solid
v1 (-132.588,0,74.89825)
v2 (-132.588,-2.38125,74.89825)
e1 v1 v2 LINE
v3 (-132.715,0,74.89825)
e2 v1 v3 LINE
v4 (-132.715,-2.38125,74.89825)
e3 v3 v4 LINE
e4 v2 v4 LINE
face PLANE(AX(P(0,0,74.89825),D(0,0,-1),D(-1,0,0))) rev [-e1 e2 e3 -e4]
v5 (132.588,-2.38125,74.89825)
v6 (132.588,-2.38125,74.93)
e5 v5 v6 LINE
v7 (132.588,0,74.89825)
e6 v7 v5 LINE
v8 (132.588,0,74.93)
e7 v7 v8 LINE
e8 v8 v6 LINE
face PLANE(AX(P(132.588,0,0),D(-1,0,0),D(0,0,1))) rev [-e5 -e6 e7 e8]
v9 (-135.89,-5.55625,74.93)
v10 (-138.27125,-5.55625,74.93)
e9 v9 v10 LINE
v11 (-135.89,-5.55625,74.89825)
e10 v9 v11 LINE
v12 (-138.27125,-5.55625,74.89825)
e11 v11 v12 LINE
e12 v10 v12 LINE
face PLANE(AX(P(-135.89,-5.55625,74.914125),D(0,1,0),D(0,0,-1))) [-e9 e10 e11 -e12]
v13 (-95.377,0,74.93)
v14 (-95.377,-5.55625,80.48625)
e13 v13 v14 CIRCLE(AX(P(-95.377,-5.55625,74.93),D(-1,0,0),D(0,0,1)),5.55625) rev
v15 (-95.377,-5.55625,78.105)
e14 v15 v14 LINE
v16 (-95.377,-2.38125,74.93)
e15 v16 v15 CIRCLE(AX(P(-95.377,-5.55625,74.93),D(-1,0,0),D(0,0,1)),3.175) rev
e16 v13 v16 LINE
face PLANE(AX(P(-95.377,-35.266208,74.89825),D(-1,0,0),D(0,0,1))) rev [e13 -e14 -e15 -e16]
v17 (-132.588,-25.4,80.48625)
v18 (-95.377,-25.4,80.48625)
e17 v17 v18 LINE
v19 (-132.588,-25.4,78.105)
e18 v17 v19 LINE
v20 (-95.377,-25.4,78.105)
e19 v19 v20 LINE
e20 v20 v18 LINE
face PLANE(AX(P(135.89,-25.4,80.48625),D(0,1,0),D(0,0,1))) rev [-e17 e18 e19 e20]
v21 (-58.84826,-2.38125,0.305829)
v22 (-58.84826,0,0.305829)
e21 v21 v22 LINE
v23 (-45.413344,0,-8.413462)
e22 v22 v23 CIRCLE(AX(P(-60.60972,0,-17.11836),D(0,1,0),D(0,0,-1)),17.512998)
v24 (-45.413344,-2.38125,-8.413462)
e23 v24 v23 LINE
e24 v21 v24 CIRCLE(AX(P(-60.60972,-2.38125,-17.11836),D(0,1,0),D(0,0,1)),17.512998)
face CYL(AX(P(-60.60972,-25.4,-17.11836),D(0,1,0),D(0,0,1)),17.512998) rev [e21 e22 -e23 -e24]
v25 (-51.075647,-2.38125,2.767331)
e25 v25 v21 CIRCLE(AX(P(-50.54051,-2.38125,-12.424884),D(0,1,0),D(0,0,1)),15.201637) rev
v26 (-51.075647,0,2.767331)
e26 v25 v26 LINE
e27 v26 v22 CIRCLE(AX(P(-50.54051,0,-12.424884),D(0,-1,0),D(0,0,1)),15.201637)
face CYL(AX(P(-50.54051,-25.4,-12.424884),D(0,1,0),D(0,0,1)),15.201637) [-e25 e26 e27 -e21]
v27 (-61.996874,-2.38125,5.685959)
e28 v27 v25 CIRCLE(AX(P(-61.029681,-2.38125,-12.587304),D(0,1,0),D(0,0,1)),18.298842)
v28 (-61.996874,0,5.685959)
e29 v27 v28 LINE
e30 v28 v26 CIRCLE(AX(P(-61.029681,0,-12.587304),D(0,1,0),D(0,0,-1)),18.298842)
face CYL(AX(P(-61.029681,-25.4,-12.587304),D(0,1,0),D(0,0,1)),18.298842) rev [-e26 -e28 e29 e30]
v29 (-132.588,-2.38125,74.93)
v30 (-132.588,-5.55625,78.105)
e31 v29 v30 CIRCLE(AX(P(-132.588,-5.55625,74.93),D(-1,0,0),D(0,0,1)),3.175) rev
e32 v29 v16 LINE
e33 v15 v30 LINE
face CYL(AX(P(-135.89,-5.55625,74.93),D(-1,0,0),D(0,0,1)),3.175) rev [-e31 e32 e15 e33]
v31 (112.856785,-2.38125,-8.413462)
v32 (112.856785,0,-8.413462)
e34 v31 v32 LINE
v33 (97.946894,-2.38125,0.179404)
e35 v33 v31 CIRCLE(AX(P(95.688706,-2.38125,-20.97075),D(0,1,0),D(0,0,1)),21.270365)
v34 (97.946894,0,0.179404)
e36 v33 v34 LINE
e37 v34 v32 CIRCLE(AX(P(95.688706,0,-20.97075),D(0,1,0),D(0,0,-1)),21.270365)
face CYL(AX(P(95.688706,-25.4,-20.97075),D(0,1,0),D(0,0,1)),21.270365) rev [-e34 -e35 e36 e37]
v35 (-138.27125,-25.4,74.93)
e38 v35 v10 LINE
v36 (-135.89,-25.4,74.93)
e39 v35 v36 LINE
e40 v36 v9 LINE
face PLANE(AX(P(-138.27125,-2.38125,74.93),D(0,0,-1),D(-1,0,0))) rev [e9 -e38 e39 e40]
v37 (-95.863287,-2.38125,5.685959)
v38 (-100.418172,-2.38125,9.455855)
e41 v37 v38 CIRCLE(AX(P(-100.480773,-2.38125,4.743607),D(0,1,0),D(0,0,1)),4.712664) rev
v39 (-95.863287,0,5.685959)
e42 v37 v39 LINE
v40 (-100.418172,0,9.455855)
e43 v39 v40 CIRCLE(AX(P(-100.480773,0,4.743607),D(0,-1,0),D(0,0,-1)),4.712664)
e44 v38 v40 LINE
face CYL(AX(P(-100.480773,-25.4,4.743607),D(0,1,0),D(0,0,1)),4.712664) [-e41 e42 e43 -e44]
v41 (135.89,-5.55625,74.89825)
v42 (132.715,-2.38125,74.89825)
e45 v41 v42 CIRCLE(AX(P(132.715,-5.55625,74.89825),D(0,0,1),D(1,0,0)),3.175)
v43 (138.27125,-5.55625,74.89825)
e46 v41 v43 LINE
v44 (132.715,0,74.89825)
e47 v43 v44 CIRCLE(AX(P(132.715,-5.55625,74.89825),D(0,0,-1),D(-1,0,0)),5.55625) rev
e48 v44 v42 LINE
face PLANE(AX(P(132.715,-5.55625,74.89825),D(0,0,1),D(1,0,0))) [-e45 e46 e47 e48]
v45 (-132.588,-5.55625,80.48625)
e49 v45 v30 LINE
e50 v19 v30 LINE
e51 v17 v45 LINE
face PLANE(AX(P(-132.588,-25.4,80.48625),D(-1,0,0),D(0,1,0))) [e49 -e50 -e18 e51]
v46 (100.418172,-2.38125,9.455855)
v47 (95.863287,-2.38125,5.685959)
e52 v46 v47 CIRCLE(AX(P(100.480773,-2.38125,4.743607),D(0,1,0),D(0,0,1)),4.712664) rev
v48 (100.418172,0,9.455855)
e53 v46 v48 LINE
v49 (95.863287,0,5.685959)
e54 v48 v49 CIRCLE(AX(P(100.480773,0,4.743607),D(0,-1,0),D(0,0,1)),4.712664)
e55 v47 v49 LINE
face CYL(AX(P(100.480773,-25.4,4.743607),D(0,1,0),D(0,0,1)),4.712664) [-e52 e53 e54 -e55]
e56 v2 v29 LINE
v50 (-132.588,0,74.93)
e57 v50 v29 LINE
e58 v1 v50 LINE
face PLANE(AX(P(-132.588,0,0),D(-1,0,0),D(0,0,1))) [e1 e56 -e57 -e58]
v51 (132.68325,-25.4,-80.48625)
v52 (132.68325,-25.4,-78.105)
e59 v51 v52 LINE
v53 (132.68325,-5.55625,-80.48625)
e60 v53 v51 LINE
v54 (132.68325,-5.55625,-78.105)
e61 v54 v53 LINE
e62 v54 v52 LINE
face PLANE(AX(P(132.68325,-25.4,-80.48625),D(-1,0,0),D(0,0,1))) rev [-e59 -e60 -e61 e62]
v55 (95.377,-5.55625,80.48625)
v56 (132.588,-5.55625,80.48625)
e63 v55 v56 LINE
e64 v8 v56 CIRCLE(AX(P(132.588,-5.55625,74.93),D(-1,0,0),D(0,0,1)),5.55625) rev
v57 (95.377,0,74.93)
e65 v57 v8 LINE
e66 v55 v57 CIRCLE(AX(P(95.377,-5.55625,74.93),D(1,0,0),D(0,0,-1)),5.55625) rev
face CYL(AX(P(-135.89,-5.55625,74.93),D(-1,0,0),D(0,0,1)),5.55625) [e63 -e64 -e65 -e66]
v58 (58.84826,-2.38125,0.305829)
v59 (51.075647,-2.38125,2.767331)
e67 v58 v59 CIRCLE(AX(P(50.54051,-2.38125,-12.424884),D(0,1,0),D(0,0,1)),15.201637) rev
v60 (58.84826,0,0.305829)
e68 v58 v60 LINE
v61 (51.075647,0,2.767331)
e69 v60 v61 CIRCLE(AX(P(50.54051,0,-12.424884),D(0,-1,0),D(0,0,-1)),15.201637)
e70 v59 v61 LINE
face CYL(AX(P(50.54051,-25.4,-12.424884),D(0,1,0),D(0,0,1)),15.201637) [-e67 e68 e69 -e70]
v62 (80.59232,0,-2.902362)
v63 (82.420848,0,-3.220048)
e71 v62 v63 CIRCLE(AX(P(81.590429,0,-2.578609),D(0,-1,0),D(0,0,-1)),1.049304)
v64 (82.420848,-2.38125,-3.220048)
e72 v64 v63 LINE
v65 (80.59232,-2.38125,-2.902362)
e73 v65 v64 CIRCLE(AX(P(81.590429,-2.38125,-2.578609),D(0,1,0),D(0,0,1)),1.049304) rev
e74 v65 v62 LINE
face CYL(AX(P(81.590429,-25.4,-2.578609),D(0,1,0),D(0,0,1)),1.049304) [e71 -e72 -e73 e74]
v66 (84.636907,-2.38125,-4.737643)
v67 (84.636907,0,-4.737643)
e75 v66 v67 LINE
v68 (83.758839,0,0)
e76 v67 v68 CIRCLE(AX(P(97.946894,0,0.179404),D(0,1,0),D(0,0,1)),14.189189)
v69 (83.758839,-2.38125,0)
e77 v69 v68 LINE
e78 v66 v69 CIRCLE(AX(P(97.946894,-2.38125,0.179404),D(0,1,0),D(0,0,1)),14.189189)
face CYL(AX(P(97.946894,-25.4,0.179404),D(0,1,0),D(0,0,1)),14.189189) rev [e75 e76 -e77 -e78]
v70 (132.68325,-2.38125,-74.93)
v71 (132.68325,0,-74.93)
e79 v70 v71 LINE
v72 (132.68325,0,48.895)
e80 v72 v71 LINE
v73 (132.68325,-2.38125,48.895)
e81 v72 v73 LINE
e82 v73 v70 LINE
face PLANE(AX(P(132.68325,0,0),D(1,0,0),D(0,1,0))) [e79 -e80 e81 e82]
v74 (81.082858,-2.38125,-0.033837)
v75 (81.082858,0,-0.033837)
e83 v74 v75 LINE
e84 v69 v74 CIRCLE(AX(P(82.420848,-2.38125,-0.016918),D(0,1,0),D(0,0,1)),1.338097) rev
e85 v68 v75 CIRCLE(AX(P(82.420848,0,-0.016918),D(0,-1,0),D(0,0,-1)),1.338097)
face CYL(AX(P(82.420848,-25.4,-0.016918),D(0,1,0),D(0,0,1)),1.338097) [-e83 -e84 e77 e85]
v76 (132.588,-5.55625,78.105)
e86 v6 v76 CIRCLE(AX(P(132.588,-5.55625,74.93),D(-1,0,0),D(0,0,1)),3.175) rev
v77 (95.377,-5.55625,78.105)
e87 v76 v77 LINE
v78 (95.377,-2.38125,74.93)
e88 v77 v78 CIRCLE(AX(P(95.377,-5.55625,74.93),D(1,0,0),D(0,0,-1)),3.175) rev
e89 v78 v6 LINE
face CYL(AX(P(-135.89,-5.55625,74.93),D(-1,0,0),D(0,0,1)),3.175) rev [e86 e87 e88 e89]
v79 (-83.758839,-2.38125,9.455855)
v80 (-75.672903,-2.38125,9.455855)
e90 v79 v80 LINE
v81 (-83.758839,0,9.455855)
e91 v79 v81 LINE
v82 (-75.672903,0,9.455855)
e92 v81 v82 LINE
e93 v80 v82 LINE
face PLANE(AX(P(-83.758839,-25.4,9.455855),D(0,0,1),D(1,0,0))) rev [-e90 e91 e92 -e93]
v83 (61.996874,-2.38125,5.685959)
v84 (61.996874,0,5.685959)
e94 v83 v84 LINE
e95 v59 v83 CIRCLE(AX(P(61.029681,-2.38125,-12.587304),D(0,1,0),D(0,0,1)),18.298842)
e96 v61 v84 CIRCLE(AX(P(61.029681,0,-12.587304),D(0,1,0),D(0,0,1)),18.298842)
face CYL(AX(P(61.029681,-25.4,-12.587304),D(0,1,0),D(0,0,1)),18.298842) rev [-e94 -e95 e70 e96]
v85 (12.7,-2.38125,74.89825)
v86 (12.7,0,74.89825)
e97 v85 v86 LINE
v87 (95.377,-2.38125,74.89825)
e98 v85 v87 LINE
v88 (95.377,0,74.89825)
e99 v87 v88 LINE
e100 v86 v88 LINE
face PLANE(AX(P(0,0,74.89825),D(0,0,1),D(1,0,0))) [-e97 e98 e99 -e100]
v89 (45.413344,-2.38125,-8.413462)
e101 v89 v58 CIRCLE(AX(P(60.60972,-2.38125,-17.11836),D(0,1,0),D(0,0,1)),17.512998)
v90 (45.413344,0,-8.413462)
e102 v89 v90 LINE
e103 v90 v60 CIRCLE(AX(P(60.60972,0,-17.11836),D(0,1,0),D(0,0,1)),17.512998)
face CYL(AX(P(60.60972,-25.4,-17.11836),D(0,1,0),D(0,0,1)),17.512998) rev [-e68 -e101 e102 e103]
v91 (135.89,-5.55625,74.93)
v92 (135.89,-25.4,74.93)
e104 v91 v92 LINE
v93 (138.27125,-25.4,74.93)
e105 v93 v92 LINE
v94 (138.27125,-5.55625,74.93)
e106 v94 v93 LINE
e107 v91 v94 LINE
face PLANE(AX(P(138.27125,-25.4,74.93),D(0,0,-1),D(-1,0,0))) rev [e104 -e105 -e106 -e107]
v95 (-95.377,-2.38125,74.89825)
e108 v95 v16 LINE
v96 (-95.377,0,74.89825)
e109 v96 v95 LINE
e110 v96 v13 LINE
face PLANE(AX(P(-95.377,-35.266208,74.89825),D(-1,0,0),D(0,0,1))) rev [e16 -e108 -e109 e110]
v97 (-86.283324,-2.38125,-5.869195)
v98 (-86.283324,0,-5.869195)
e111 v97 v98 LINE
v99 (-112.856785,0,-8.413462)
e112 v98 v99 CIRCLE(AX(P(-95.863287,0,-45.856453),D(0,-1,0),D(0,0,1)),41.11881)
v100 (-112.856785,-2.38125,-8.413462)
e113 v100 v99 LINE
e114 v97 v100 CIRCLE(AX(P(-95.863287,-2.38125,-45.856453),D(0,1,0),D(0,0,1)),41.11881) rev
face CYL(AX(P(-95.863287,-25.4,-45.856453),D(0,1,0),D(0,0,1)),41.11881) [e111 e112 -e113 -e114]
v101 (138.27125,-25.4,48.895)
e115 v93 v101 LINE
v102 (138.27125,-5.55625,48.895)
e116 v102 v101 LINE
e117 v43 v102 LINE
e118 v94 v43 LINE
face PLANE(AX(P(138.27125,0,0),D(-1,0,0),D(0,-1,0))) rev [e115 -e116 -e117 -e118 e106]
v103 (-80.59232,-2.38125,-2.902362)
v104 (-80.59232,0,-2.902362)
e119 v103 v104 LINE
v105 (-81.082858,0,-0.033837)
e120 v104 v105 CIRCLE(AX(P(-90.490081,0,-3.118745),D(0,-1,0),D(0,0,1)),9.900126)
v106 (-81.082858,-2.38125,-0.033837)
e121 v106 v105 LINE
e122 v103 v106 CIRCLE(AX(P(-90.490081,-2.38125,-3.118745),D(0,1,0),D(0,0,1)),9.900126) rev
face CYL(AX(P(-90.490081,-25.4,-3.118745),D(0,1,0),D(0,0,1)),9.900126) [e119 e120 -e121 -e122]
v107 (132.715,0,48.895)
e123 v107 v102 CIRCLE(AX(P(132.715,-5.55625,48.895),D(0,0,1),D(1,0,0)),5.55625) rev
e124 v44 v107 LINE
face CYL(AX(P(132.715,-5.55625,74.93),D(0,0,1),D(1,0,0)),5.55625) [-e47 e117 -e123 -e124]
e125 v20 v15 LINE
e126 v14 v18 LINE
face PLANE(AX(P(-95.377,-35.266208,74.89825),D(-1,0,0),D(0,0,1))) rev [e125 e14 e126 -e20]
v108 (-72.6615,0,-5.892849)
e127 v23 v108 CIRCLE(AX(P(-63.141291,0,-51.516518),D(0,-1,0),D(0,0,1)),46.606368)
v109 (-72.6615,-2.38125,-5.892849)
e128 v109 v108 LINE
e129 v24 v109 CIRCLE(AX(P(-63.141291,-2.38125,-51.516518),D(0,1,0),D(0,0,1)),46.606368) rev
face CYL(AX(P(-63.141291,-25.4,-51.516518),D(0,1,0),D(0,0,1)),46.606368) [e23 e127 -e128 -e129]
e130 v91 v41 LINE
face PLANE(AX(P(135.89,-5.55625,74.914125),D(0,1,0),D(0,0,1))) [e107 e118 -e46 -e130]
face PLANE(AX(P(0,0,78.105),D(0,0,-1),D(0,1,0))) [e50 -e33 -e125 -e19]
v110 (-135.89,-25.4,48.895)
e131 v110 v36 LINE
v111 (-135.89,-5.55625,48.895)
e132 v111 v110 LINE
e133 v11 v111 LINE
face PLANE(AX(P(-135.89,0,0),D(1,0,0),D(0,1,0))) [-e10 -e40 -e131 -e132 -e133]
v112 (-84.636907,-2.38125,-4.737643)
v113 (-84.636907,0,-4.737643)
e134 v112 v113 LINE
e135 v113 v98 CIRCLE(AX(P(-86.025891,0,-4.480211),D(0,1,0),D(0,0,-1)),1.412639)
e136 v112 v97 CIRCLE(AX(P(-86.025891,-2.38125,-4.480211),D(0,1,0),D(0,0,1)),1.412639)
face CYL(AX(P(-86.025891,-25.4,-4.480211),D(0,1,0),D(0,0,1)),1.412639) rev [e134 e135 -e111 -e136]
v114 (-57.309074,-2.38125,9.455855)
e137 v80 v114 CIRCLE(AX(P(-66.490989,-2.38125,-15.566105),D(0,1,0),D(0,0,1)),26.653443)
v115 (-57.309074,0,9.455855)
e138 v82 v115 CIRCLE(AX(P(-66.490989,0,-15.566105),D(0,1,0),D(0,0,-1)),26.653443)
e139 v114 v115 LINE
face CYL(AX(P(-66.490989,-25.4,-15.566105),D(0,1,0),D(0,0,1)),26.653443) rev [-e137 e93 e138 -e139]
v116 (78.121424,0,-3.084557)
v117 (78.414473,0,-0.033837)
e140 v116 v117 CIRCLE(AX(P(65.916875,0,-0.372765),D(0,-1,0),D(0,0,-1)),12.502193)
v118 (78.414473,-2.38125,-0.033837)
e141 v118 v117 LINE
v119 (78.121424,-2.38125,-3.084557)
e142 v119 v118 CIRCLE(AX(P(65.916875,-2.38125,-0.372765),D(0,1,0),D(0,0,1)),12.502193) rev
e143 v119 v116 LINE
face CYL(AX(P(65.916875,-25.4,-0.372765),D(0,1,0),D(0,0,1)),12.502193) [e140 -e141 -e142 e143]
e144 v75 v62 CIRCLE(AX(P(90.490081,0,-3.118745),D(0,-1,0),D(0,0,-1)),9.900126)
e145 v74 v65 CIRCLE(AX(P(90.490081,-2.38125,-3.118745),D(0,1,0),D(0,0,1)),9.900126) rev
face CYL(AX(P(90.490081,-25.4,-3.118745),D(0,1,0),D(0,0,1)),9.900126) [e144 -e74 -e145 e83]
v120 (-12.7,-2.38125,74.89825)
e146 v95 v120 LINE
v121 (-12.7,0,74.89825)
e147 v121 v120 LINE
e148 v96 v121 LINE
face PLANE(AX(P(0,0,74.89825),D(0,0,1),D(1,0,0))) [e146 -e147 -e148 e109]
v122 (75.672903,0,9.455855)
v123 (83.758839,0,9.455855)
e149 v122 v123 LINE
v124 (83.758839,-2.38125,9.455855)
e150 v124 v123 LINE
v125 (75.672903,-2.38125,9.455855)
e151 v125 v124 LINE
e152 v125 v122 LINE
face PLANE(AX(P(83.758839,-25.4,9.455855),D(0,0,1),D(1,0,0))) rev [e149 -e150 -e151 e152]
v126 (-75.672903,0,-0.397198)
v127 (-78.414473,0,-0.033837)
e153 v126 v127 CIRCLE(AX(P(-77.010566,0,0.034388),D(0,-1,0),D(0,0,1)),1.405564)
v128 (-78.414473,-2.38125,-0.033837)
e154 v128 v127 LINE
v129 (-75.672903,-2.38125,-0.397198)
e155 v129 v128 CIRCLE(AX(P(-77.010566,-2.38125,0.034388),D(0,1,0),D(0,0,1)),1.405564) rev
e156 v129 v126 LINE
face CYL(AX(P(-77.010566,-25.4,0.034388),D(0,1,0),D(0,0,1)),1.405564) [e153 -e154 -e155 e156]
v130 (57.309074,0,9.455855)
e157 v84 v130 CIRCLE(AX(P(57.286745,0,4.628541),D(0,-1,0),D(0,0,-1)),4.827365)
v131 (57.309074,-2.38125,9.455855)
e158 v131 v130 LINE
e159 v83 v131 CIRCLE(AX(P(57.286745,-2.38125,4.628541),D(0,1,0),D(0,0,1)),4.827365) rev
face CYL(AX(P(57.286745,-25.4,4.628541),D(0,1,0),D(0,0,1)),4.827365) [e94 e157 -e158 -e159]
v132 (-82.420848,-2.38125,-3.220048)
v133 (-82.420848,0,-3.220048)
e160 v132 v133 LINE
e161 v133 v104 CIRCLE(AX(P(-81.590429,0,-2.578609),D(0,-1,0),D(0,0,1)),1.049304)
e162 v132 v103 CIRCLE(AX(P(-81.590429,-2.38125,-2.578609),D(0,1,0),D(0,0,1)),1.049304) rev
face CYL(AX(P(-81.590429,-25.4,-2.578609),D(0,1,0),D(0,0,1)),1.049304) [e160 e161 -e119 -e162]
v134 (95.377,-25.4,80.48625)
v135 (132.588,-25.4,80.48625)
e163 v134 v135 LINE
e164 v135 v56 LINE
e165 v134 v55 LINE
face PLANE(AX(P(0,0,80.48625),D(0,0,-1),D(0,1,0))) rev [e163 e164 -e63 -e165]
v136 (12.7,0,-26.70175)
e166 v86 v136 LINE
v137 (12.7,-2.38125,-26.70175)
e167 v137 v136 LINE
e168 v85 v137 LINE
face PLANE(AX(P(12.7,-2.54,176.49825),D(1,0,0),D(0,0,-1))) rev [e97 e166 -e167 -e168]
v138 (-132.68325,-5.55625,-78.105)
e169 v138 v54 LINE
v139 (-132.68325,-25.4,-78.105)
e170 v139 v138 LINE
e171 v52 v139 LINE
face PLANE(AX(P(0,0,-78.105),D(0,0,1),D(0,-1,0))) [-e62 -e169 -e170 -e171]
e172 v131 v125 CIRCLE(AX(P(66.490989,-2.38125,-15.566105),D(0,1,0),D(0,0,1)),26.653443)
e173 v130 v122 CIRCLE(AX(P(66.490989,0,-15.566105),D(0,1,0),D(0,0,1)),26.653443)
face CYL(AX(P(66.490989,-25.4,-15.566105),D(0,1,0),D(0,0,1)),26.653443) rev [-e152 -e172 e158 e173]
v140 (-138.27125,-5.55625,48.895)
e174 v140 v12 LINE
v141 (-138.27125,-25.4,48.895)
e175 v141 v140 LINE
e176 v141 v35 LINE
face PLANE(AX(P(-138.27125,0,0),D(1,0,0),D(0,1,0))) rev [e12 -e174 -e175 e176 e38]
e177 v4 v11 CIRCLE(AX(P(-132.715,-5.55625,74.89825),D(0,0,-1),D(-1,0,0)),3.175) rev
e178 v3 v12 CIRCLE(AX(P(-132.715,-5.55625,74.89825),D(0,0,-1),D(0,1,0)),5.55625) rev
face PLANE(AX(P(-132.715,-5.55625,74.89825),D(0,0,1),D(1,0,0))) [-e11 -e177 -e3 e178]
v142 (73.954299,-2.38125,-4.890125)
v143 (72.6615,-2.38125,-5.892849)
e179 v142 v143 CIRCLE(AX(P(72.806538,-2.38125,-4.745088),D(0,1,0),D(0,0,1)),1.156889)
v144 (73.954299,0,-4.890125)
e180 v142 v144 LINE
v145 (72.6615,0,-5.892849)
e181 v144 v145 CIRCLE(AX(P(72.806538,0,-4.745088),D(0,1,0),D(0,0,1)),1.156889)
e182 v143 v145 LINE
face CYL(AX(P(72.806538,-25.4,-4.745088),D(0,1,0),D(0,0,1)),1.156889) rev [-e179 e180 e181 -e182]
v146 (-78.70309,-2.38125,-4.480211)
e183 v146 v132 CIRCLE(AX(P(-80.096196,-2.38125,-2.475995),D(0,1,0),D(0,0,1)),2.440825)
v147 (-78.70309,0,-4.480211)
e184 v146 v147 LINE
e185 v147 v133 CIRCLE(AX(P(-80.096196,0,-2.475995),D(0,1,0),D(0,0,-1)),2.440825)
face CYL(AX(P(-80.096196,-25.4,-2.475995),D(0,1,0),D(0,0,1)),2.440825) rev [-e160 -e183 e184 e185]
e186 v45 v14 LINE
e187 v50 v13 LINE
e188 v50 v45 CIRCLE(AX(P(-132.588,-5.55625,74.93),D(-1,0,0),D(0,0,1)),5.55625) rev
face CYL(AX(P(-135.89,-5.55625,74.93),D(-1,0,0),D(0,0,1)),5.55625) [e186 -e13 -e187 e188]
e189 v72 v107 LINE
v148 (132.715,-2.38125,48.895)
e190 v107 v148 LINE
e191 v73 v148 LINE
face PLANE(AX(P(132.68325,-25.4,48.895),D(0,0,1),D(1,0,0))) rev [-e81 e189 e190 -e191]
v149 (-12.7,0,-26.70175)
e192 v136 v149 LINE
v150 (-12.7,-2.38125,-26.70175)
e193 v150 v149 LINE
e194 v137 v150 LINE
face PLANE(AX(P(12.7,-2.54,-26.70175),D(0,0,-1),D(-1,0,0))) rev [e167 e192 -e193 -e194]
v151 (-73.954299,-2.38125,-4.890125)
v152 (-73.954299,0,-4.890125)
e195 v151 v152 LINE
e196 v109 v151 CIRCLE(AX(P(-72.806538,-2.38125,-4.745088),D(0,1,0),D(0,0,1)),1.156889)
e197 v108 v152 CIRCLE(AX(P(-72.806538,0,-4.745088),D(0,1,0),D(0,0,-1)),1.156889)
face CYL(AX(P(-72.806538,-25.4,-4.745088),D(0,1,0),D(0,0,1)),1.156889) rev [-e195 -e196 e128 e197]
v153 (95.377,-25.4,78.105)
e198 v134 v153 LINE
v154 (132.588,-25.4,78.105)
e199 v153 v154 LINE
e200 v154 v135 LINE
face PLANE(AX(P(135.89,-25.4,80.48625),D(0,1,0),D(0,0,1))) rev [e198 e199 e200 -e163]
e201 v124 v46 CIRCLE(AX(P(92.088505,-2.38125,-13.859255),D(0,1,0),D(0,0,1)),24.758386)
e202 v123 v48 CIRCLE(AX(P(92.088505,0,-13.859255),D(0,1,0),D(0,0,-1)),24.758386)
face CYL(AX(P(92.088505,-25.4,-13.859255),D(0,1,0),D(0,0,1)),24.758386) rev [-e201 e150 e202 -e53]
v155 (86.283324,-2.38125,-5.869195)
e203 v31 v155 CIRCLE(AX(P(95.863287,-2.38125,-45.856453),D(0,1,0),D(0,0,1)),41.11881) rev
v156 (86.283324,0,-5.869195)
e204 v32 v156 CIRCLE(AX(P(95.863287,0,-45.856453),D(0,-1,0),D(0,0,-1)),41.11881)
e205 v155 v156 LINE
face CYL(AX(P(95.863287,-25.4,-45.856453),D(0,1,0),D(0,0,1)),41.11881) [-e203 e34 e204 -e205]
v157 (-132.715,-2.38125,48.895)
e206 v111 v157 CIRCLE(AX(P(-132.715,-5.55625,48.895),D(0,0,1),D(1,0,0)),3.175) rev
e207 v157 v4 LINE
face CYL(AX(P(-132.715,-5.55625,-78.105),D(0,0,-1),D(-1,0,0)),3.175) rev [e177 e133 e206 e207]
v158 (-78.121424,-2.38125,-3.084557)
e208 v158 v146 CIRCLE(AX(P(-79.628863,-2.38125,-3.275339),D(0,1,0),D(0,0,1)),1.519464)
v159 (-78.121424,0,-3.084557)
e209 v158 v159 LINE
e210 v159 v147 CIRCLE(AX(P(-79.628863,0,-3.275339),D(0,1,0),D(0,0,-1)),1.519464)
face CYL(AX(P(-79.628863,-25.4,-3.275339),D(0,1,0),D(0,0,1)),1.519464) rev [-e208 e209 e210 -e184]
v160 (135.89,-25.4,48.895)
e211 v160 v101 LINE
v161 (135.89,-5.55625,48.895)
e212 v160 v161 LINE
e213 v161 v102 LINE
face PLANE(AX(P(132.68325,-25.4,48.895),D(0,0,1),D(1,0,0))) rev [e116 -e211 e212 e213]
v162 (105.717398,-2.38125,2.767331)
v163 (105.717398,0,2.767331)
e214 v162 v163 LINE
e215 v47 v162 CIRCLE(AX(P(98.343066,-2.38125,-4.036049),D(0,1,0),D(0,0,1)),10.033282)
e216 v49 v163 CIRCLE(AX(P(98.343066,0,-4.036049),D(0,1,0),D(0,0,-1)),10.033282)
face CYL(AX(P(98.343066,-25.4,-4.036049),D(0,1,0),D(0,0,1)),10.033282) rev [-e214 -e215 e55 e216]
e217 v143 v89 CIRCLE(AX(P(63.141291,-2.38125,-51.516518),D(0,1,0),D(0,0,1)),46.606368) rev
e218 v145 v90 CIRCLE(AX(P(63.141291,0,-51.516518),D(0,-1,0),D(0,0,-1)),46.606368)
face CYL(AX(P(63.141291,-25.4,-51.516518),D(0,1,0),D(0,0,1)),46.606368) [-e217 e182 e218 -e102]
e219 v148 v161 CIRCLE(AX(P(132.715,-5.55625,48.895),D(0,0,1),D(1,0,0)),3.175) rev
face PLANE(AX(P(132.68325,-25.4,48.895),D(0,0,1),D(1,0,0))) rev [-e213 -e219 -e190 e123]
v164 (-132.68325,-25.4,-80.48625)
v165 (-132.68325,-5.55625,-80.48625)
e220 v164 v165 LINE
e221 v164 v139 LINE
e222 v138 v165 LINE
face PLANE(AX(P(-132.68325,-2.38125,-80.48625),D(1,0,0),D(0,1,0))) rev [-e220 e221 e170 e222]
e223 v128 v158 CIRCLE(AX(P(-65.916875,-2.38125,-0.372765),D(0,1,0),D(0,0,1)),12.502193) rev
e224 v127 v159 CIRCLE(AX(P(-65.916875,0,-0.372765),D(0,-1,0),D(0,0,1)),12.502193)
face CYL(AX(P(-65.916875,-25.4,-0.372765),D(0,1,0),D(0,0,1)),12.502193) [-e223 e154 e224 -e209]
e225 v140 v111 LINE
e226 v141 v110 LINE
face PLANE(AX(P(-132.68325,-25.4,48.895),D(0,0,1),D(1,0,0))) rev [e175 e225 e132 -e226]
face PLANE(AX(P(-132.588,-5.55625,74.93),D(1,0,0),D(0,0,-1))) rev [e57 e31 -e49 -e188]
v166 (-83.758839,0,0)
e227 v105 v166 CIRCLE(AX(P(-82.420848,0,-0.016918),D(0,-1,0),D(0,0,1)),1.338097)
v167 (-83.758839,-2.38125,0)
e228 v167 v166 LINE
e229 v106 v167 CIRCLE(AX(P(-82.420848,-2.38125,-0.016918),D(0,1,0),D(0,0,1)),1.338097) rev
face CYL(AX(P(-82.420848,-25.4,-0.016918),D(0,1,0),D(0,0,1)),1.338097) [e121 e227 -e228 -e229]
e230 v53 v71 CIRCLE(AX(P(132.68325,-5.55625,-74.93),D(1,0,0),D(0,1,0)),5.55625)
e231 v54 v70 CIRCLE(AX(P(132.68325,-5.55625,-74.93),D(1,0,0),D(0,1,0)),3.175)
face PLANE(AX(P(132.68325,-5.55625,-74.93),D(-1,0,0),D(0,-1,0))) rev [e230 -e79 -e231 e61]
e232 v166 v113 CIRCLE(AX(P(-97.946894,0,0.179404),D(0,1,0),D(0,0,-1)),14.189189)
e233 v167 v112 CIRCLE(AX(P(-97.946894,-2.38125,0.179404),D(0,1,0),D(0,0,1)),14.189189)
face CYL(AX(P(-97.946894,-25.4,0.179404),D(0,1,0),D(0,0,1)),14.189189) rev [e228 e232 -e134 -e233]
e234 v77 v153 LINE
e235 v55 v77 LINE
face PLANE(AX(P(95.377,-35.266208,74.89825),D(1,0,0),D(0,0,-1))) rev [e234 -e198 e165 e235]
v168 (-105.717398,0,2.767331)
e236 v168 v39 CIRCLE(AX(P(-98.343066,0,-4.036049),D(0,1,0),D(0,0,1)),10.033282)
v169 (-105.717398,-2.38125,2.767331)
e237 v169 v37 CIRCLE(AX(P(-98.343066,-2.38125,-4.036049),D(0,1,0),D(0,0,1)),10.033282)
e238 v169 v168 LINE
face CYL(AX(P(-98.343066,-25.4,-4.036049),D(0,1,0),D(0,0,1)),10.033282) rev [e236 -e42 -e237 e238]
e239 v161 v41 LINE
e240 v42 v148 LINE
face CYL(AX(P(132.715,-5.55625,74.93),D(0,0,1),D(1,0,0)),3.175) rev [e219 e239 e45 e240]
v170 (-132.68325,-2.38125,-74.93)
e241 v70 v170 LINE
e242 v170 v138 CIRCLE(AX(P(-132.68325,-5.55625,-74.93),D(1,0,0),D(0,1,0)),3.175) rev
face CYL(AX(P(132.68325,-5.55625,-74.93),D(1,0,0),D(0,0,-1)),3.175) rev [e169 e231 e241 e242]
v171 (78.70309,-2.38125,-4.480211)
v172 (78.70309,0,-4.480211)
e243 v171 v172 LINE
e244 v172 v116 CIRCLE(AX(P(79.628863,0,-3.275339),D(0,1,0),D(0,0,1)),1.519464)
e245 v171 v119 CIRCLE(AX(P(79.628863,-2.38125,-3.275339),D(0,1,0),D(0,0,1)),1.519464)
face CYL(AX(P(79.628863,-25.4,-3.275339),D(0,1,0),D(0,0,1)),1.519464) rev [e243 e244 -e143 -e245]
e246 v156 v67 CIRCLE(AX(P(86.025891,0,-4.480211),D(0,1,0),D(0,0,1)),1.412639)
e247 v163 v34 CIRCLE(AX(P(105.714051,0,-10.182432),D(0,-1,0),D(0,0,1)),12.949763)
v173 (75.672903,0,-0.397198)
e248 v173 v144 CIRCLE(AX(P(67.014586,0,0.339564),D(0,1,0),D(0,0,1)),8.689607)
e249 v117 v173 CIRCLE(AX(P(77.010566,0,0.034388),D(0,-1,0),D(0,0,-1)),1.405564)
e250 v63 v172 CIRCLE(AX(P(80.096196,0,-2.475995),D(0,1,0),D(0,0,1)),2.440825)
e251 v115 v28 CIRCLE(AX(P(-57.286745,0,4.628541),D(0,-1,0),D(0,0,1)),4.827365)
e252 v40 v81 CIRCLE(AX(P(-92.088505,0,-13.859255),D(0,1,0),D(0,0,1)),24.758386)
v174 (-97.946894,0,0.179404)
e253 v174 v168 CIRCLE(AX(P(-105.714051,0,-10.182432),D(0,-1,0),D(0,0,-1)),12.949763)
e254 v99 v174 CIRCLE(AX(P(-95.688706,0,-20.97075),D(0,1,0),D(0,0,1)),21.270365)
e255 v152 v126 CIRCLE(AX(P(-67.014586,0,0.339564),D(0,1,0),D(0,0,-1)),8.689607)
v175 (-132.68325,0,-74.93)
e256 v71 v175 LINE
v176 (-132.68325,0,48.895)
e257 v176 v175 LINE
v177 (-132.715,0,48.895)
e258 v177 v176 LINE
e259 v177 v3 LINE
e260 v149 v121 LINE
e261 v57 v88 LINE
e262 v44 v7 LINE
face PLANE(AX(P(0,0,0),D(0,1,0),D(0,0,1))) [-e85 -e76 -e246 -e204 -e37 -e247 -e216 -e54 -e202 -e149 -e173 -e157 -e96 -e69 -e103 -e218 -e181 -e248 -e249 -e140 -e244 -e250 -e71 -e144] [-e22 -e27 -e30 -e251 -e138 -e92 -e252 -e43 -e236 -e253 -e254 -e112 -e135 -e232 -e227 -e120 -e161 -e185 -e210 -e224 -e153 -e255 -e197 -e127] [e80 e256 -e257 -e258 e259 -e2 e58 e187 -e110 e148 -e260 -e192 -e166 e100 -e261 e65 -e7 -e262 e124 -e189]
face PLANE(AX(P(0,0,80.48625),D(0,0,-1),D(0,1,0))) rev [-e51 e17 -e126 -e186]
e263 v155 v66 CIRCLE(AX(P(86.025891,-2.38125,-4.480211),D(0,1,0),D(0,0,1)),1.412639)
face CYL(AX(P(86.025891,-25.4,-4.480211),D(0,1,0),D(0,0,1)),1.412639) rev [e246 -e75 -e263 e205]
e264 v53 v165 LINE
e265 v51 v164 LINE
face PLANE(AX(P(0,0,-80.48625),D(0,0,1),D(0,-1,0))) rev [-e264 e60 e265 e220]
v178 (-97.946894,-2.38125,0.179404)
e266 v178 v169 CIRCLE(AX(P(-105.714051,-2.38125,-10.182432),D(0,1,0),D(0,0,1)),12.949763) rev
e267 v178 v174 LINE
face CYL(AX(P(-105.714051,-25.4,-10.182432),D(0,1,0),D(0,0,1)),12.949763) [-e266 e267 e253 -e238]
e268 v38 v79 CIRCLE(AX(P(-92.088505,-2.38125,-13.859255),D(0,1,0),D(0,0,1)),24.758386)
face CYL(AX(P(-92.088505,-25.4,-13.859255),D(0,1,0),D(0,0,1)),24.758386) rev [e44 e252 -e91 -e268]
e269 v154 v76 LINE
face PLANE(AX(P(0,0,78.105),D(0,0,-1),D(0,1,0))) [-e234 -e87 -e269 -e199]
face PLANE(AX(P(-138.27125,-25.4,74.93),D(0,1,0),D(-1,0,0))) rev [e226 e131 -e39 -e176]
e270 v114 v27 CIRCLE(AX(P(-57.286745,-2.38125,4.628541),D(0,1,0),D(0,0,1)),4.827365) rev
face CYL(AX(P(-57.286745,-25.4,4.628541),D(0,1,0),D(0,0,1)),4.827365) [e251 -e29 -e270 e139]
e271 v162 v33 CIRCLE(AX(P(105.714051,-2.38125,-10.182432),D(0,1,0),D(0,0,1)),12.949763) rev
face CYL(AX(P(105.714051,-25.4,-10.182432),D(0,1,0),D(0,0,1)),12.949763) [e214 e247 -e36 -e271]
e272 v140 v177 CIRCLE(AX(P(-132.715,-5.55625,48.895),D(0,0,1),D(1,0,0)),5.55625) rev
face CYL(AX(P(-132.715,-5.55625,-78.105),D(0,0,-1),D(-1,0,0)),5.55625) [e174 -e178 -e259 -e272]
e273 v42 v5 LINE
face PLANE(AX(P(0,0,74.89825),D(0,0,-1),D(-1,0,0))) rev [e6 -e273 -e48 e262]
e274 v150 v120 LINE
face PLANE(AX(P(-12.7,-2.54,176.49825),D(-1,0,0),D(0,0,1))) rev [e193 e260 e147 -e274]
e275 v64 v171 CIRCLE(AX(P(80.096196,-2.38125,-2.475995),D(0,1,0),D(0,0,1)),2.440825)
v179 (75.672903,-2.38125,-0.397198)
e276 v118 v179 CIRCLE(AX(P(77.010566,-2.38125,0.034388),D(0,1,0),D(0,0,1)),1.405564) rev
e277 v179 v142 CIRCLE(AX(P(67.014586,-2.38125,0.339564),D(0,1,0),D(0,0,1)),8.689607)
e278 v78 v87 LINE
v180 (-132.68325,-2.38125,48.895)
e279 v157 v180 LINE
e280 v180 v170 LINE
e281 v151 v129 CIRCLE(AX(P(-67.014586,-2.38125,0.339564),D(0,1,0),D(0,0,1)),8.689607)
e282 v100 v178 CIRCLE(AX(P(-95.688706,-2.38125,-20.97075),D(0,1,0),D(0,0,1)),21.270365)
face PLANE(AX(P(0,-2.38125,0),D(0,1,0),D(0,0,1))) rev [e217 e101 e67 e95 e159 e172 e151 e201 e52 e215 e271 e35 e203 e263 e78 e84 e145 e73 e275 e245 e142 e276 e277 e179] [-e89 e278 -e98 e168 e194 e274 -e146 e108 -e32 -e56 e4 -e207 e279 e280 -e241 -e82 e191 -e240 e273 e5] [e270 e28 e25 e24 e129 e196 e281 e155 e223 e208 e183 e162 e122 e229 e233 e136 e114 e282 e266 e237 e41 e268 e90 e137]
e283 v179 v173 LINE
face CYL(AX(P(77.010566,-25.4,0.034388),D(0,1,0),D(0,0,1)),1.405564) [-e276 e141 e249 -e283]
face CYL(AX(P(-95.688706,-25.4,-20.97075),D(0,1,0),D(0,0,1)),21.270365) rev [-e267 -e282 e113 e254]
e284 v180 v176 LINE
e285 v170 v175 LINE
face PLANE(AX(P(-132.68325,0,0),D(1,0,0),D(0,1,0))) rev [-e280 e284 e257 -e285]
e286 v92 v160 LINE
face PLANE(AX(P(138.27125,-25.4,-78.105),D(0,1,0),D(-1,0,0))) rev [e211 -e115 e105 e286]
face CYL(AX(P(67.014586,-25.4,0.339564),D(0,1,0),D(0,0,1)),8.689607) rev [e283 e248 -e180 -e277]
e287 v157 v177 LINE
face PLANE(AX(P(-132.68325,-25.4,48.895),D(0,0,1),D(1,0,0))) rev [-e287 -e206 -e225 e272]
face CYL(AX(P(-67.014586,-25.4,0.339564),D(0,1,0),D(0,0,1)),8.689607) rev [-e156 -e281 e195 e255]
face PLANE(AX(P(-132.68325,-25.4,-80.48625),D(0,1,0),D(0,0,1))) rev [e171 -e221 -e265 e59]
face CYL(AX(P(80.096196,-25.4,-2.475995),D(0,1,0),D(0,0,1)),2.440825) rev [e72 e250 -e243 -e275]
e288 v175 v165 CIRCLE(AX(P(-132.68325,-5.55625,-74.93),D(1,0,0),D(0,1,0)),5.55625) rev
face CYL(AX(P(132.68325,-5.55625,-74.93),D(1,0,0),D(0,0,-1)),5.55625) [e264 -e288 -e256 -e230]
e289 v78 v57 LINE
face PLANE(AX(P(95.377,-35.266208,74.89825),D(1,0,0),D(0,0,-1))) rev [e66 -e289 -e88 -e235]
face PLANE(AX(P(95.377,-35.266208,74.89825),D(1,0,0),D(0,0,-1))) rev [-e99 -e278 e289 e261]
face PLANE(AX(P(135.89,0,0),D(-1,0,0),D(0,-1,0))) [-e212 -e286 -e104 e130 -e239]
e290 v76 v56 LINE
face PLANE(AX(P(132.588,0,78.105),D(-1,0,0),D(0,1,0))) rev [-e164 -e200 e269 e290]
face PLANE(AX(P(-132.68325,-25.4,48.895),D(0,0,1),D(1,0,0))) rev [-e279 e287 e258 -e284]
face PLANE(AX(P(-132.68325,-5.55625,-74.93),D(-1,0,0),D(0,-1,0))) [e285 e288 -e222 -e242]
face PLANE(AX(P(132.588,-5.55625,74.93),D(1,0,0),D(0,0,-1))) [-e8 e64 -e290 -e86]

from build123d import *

# Parameters (mm, degrees)
SKETCH1_W                    = 271.78
SKETCH1_H                    = 156.21
BASE_FLANGE1_DEPTH           = 2.38125
EDGE_FLANGE1_STRIP_W         = 15.875
EDGE_FLANGE1_STRIP_H         = 2.38125
EDGE_FLANGE1_STRIP_CUT_DEPTH = 271.78
EDGE_FLANGE1_DEPTH           = 271.78
EDGE_FLANGE2_STRIP_W         = 15.875
EDGE_FLANGE2_STRIP_H         = 2.38125
EDGE_FLANGE2_STRIP_CUT_DEPTH = 153.035
EDGE_FLANGE2_DEPTH           = 153.035
SKETCH14_W                   = 127
SKETCH14_H                   = 30.097595223
CUT_EXTRUDE1_DEPTH           = 5.588
EDGE_FLANGE3_STRIP_W         = 15.875
EDGE_FLANGE3_STRIP_H         = 2.38125
EDGE_FLANGE3_STRIP_CUT_DEPTH = 153.035
EDGE_FLANGE3_DEPTH           = 153.035
SKETCH18_W                   = 127
SKETCH18_H                   = 45.504454023
CUT_EXTRUDE2_DEPTH           = 5.588
CUT_EXTRUDE3_START           = -3.302
CUT_EXTRUDE3_DEPTH           = 5.68325
CUT_EXTRUDE4_START           = -3.302
CUT_EXTRUDE4_DEPTH           = 5.68325
EDGE_FLANGE4_STRIP_W         = 15.875
EDGE_FLANGE4_STRIP_H         = 2.38125
EDGE_FLANGE4_STRIP_CUT_DEPTH = 265.3665
EDGE_FLANGE4_DEPTH           = 265.3665
SKETCH24_W                   = 190.754
SKETCH24_H                   = 70.532416994
CUT_EXTRUDE5_DEPTH           = 5.588
SKETCH25_W                   = 25.4
SKETCH25_H                   = 203.2
CUT_EXTRUDE6_DEPTH           = 2.54
CUT_EXTRUDE7_DEPTH           = 162.994243773


# Read off the part's stored shape, not the designer's step: Cut-Extrude3, Cut-Extrude4
# Sheet-metal steps are written as plain solids
with BuildPart() as part:
    # Sketch1 → Base-Flange1 (new body)
    with BuildSketch(Plane(origin=(0, 0, 0), x_dir=(1, 0, 0), z_dir=(0, 1, 0))):
        Rectangle(SKETCH1_W, SKETCH1_H)
    extrude(amount=-BASE_FLANGE1_DEPTH)

    # Edge-Flange1 strip (across the edge) → Edge-Flange1 strip cut (cut)
    with BuildSketch(Plane(origin=(135.89, -2.38125, 78.105), x_dir=(0, 0, -1), z_dir=(-1, 0, 0))):
        with Locations((-4.7625, -1.190625)):
            Rectangle(EDGE_FLANGE1_STRIP_W, EDGE_FLANGE1_STRIP_H)
    extrude(amount=EDGE_FLANGE1_STRIP_CUT_DEPTH, mode=Mode.SUBTRACT)

    # Edge-Flange1 section (across the edge) → Edge-Flange1 (add)
    with BuildSketch(Plane(origin=(135.89, -2.38125, 78.105), x_dir=(0, 0, -1), z_dir=(-1, 0, 0))):
        with BuildLine():
            Line((-2.38125, 3.175), (-2.38125, 23.01875))
            Line((-2.38125, 23.01875), (0, 23.01875))
            Line((0, 23.01875), (0, 3.175))
            ThreePointArc((0, 3.175), (0.92993597, 0.92993597), (3.175, 0))
            Line((3.175, 0), (3.175, -2.38125))
            ThreePointArc((3.175, -2.38125), (-0.753862053, -0.753862053), (-2.38125, 3.175))
        make_face()
    extrude(amount=EDGE_FLANGE1_DEPTH)

    # Edge-Flange2 strip (across the edge) → Edge-Flange2 strip cut (cut)
    with BuildSketch(Plane(origin=(135.89, -2.38125, -78.105), x_dir=(-1, 0, 0), z_dir=(0, 0, 1))):
        with Locations((-4.7625, -1.190625)):
            Rectangle(EDGE_FLANGE2_STRIP_W, EDGE_FLANGE2_STRIP_H)
    extrude(amount=EDGE_FLANGE2_STRIP_CUT_DEPTH, mode=Mode.SUBTRACT)

    # Edge-Flange2 section (across the edge) → Edge-Flange2 (add)
    with BuildSketch(Plane(origin=(135.89, -2.38125, -78.105), x_dir=(-1, 0, 0), z_dir=(0, 0, 1))):
        with BuildLine():
            Line((-2.38125, 3.175), (-2.38125, 23.01875))
            Line((-2.38125, 23.01875), (0, 23.01875))
            Line((0, 23.01875), (0, 3.175))
            ThreePointArc((0, 3.175), (0.92993597, 0.92993597), (3.175, 0))
            Line((3.175, 0), (3.175, -2.38125))
            ThreePointArc((3.175, -2.38125), (-0.753862053, -0.753862053), (-2.38125, 3.175))
        make_face()
    extrude(amount=EDGE_FLANGE2_DEPTH)

    # Sketch14 → Cut-Extrude1 (cut)
    with BuildSketch(Plane(origin=(138.27125, 0, 0), x_dir=(0, 0, -1), z_dir=(1, 0, 0))):
        with Locations((14.605, -10.351202389)):
            Rectangle(SKETCH14_W, SKETCH14_H)
    extrude(amount=-CUT_EXTRUDE1_DEPTH, mode=Mode.SUBTRACT)

    # Edge-Flange3 strip (across the edge) → Edge-Flange3 strip cut (cut)
    with BuildSketch(Plane(origin=(-135.89, -2.38125, 74.93), x_dir=(1, 0, 0), z_dir=(0, 0, -1))):
        with Locations((-4.7625, -1.190625)):
            Rectangle(EDGE_FLANGE3_STRIP_W, EDGE_FLANGE3_STRIP_H)
    extrude(amount=EDGE_FLANGE3_STRIP_CUT_DEPTH, mode=Mode.SUBTRACT)

    # Edge-Flange3 section (across the edge) → Edge-Flange3 (add)
    with BuildSketch(Plane(origin=(-135.89, -2.38125, 74.93), x_dir=(1, 0, 0), z_dir=(0, 0, -1))):
        with BuildLine():
            Line((-2.38125, 3.175), (-2.38125, 23.01875))
            Line((-2.38125, 23.01875), (0, 23.01875))
            Line((0, 23.01875), (0, 3.175))
            ThreePointArc((0, 3.175), (0.92993597, 0.92993597), (3.175, 0))
            Line((3.175, 0), (3.175, -2.38125))
            ThreePointArc((3.175, -2.38125), (-0.753862053, -0.753862053), (-2.38125, 3.175))
        make_face()
    extrude(amount=EDGE_FLANGE3_DEPTH)

    # Sketch18 → Cut-Extrude2 (cut)
    with BuildSketch(Plane.ZY.offset(138.27125)):
        with Locations((-14.605, -2.647772988)):
            Rectangle(SKETCH18_W, SKETCH18_H)
    extrude(amount=-CUT_EXTRUDE2_DEPTH, mode=Mode.SUBTRACT)

    # Cut-Extrude3 outline → Cut-Extrude3 (cut)
    with BuildSketch(Plane.ZY.offset(135.89).offset(CUT_EXTRUDE3_START)):
        with BuildLine():
            Line((74.93, 0), (74.89825, 0))
            Line((74.89825, 0), (74.89825, -5.55625))
            Line((74.89825, -5.55625), (74.93, -5.55625))
            Line((74.93, -5.55625), (74.93, -2.38125))
            ThreePointArc((74.93, -2.38125), (77.17506403, -3.31118597), (78.105, -5.55625))
            Line((78.105, -5.55625), (78.105, -25.4))
            Line((78.105, -25.4), (80.48625, -25.4))
            Line((80.48625, -25.4), (80.48625, -5.55625))
            ThreePointArc((80.48625, -5.55625), (78.858862053, -1.627387947), (74.93, 0))
        make_face()
    extrude(amount=CUT_EXTRUDE3_DEPTH, mode=Mode.SUBTRACT)

    # Cut-Extrude4 outline → Cut-Extrude4 (cut)
    with BuildSketch(Plane(origin=(135.89, 0, 0), x_dir=(0, 0, -1), z_dir=(1, 0, 0)).offset(CUT_EXTRUDE4_START)):
        with BuildLine():
            Line((-74.89825, 0), (-74.93, 0))
            ThreePointArc((-74.93, 0), (-78.858862053, -1.627387947), (-80.48625, -5.55625))
            Line((-80.48625, -5.55625), (-80.48625, -25.4))
            Line((-80.48625, -25.4), (-78.105, -25.4))
            Line((-78.105, -25.4), (-78.105, -5.55625))
            ThreePointArc((-78.105, -5.55625), (-77.17506403, -3.31118597), (-74.93, -2.38125))
            Line((-74.93, -2.38125), (-74.93, -5.55625))
            Line((-74.93, -5.55625), (-74.89825, -5.55625))
            Line((-74.89825, -5.55625), (-74.89825, 0))
        make_face()
    extrude(amount=CUT_EXTRUDE4_DEPTH, mode=Mode.SUBTRACT)

    # Edge-Flange4 strip (across the edge) → Edge-Flange4 strip cut (cut)
    with BuildSketch(Plane(origin=(-132.68325, -2.38125, -78.105), x_dir=(0, 0, 1), z_dir=(1, 0, 0))):
        with Locations((-4.7625, -1.190625)):
            Rectangle(EDGE_FLANGE4_STRIP_W, EDGE_FLANGE4_STRIP_H)
    extrude(amount=EDGE_FLANGE4_STRIP_CUT_DEPTH, mode=Mode.SUBTRACT)

    # Edge-Flange4 section (across the edge) → Edge-Flange4 (add)
    with BuildSketch(Plane(origin=(-132.68325, -2.38125, -78.105), x_dir=(0, 0, 1), z_dir=(1, 0, 0))):
        with BuildLine():
            Line((-2.38125, 3.175), (-2.38125, 23.01875))
            Line((-2.38125, 23.01875), (0, 23.01875))
            Line((0, 23.01875), (0, 3.175))
            ThreePointArc((0, 3.175), (0.92993597, 0.92993597), (3.175, 0))
            Line((3.175, 0), (3.175, -2.38125))
            ThreePointArc((3.175, -2.38125), (-0.753862053, -0.753862053), (-2.38125, 3.175))
        make_face()
    extrude(amount=EDGE_FLANGE4_DEPTH)

    # Sketch24 → Cut-Extrude5 (cut)
    with BuildSketch(Plane.XY.offset(80.48625)):
        Rectangle(SKETCH24_W, SKETCH24_H)
    extrude(amount=-CUT_EXTRUDE5_DEPTH, mode=Mode.SUBTRACT)

    # Sketch25 → Cut-Extrude6 (cut)
    with BuildSketch(Plane(origin=(0, 0, 0), x_dir=(1, 0, 0), z_dir=(0, 1, 0))):
        with Locations((0, -74.89825)):
            Rectangle(SKETCH25_W, SKETCH25_H)
    extrude(amount=-CUT_EXTRUDE6_DEPTH, mode=Mode.SUBTRACT)

    # Sketch27 → Cut-Extrude7 (cut, through all)
    with BuildSketch(Plane(origin=(0, 0, 0), x_dir=(1, 0, 0), z_dir=(0, 1, 0))):
        with BuildLine():
            Line((-83.758838792, -9.45585461), (-75.67290259, -9.45585461))
            ThreePointArc((-75.67290259, -9.45585461), (-66.490988533, -11.087337706), (-57.309074476, -9.45585461))
            ThreePointArc((-57.309074476, -9.45585461), (-60.311983549, -8.390373583), (-61.996874262, -5.685959414))
            ThreePointArc((-61.996874262, -5.685959414), (-56.305231118, -5.091134548), (-51.075646545, -2.767330875))
            ThreePointArc((-51.075646545, -2.767330875), (-55.130053613, -2.067384812), (-58.848260419, -0.305828877))
            ThreePointArc((-58.848260419, -0.305828877), (-51.075646545, 2.428004784), (-45.41334394, 8.413462337))
            ThreePointArc((-45.41334394, 8.413462337), (-58.848260419, 5.108292363), (-72.661500429, 5.892849412))
            ThreePointArc((-72.661500429, 5.892849412), (-73.515570568, 5.659234682), (-73.954298796, 4.890125335))
            ThreePointArc((-73.954298796, 4.890125335), (-75.13069526, 2.764954432), (-75.67290259, 0.397197853))
            ThreePointArc((-75.67290259, 0.397197853), (-76.825891015, -1.427766493), (-78.414472909, 0.033836989))
            ThreePointArc((-78.414472909, 0.033836989), (-78.361782981, 1.568210714), (-78.121423666, 3.084557099))
            ThreePointArc((-78.121423666, 3.084557099), (-78.226332012, 3.859871666), (-78.703089746, 4.480210688))
            ThreePointArc((-78.703089746, 4.480210688), (-80.87974367, 4.787634603), (-82.4208484, 3.22004793))
            ThreePointArc((-82.4208484, 3.22004793), (-81.410815763, 3.612426431), (-80.592319592, 2.902362466))
            ThreePointArc((-80.592319592, 2.902362466), (-80.7316121, 1.449976952), (-81.082858007, 0.033836989))
            ThreePointArc((-81.082858007, 0.033836989), (-82.403929905, -1.321071898), (-83.758838792, 0))
            ThreePointArc((-83.758838792, 0), (-83.995302952, 2.406365651), (-84.636907307, 4.737643154))
            ThreePointArc((-84.636907307, 4.737643154), (-85.225763559, 5.644402971), (-86.283323823, 5.869194738))
            ThreePointArc((-86.283323823, 5.869194738), (-99.782272929, 4.924826167), (-112.856785411, 8.413462337))
            ThreePointArc((-112.856785411, 8.413462337), (-106.309643061, 2.541856444), (-97.946894022, -0.179403782))
            ThreePointArc((-97.946894022, -0.179403782), (-101.622165605, -2.103854793), (-105.71739849, -2.767330875))
            ThreePointArc((-105.71739849, -2.767330875), (-101.192410266, -5.584137657), (-95.863287335, -5.685959414))
            ThreePointArc((-95.863287335, -5.685959414), (-97.475971718, -8.374084711), (-100.418171986, -9.45585461))
            ThreePointArc((-100.418171986, -9.45585461), (-92.088505389, -10.899131081), (-83.758838792, -9.45585461))
        make_face()
        with BuildLine():
            Line((83.758838792, -9.45585461), (75.67290259, -9.45585461))
            ThreePointArc((75.67290259, -9.45585461), (66.490988533, -11.087337706), (57.309074476, -9.45585461))
            ThreePointArc((57.309074476, -9.45585461), (60.311983549, -8.390373583), (61.996874262, -5.685959414))
            ThreePointArc((61.996874262, -5.685959414), (56.305231118, -5.091134548), (51.075646545, -2.767330875))
            ThreePointArc((51.075646545, -2.767330875), (55.130053613, -2.067384812), (58.848260419, -0.305828877))
            ThreePointArc((58.848260419, -0.305828877), (51.075646545, 2.428004784), (45.41334394, 8.413462337))
            ThreePointArc((45.41334394, 8.413462337), (58.848260419, 5.108292363), (72.661500429, 5.892849412))
            ThreePointArc((72.661500429, 5.892849412), (73.515570568, 5.659234682), (73.954298796, 4.890125335))
            ThreePointArc((73.954298796, 4.890125335), (75.13069526, 2.764954432), (75.67290259, 0.397197853))
            ThreePointArc((75.67290259, 0.397197853), (76.825891015, -1.427766493), (78.414472909, 0.033836989))
            ThreePointArc((78.414472909, 0.033836989), (78.361782981, 1.568210714), (78.121423666, 3.084557099))
            ThreePointArc((78.121423666, 3.084557099), (78.226332012, 3.859871666), (78.703089746, 4.480210688))
            ThreePointArc((78.703089746, 4.480210688), (80.87974367, 4.787634603), (82.4208484, 3.22004793))
            ThreePointArc((82.4208484, 3.22004793), (81.410815763, 3.612426431), (80.592319592, 2.902362466))
            ThreePointArc((80.592319592, 2.902362466), (80.7316121, 1.449976952), (81.082858007, 0.033836989))
            ThreePointArc((81.082858007, 0.033836989), (82.403929905, -1.321071898), (83.758838792, 0))
            ThreePointArc((83.758838792, 0), (83.995302952, 2.406365651), (84.636907307, 4.737643154))
            ThreePointArc((84.636907307, 4.737643154), (85.225763559, 5.644402971), (86.283323823, 5.869194738))
            ThreePointArc((86.283323823, 5.869194738), (99.782272929, 4.924826167), (112.856785411, 8.413462337))
            ThreePointArc((112.856785411, 8.413462337), (106.309643061, 2.541856444), (97.946894022, -0.179403782))
            ThreePointArc((97.946894022, -0.179403782), (101.622165605, -2.103854793), (105.71739849, -2.767330875))
            ThreePointArc((105.71739849, -2.767330875), (101.192410266, -5.584137657), (95.863287335, -5.685959414))
            ThreePointArc((95.863287335, -5.685959414), (97.475971718, -8.374084711), (100.418171986, -9.45585461))
            ThreePointArc((100.418171986, -9.45585461), (92.088505389, -10.899131081), (83.758838792, -9.45585461))
        make_face()
    extrude(amount=-CUT_EXTRUDE7_DEPTH, mode=Mode.SUBTRACT)


solid = part.part
